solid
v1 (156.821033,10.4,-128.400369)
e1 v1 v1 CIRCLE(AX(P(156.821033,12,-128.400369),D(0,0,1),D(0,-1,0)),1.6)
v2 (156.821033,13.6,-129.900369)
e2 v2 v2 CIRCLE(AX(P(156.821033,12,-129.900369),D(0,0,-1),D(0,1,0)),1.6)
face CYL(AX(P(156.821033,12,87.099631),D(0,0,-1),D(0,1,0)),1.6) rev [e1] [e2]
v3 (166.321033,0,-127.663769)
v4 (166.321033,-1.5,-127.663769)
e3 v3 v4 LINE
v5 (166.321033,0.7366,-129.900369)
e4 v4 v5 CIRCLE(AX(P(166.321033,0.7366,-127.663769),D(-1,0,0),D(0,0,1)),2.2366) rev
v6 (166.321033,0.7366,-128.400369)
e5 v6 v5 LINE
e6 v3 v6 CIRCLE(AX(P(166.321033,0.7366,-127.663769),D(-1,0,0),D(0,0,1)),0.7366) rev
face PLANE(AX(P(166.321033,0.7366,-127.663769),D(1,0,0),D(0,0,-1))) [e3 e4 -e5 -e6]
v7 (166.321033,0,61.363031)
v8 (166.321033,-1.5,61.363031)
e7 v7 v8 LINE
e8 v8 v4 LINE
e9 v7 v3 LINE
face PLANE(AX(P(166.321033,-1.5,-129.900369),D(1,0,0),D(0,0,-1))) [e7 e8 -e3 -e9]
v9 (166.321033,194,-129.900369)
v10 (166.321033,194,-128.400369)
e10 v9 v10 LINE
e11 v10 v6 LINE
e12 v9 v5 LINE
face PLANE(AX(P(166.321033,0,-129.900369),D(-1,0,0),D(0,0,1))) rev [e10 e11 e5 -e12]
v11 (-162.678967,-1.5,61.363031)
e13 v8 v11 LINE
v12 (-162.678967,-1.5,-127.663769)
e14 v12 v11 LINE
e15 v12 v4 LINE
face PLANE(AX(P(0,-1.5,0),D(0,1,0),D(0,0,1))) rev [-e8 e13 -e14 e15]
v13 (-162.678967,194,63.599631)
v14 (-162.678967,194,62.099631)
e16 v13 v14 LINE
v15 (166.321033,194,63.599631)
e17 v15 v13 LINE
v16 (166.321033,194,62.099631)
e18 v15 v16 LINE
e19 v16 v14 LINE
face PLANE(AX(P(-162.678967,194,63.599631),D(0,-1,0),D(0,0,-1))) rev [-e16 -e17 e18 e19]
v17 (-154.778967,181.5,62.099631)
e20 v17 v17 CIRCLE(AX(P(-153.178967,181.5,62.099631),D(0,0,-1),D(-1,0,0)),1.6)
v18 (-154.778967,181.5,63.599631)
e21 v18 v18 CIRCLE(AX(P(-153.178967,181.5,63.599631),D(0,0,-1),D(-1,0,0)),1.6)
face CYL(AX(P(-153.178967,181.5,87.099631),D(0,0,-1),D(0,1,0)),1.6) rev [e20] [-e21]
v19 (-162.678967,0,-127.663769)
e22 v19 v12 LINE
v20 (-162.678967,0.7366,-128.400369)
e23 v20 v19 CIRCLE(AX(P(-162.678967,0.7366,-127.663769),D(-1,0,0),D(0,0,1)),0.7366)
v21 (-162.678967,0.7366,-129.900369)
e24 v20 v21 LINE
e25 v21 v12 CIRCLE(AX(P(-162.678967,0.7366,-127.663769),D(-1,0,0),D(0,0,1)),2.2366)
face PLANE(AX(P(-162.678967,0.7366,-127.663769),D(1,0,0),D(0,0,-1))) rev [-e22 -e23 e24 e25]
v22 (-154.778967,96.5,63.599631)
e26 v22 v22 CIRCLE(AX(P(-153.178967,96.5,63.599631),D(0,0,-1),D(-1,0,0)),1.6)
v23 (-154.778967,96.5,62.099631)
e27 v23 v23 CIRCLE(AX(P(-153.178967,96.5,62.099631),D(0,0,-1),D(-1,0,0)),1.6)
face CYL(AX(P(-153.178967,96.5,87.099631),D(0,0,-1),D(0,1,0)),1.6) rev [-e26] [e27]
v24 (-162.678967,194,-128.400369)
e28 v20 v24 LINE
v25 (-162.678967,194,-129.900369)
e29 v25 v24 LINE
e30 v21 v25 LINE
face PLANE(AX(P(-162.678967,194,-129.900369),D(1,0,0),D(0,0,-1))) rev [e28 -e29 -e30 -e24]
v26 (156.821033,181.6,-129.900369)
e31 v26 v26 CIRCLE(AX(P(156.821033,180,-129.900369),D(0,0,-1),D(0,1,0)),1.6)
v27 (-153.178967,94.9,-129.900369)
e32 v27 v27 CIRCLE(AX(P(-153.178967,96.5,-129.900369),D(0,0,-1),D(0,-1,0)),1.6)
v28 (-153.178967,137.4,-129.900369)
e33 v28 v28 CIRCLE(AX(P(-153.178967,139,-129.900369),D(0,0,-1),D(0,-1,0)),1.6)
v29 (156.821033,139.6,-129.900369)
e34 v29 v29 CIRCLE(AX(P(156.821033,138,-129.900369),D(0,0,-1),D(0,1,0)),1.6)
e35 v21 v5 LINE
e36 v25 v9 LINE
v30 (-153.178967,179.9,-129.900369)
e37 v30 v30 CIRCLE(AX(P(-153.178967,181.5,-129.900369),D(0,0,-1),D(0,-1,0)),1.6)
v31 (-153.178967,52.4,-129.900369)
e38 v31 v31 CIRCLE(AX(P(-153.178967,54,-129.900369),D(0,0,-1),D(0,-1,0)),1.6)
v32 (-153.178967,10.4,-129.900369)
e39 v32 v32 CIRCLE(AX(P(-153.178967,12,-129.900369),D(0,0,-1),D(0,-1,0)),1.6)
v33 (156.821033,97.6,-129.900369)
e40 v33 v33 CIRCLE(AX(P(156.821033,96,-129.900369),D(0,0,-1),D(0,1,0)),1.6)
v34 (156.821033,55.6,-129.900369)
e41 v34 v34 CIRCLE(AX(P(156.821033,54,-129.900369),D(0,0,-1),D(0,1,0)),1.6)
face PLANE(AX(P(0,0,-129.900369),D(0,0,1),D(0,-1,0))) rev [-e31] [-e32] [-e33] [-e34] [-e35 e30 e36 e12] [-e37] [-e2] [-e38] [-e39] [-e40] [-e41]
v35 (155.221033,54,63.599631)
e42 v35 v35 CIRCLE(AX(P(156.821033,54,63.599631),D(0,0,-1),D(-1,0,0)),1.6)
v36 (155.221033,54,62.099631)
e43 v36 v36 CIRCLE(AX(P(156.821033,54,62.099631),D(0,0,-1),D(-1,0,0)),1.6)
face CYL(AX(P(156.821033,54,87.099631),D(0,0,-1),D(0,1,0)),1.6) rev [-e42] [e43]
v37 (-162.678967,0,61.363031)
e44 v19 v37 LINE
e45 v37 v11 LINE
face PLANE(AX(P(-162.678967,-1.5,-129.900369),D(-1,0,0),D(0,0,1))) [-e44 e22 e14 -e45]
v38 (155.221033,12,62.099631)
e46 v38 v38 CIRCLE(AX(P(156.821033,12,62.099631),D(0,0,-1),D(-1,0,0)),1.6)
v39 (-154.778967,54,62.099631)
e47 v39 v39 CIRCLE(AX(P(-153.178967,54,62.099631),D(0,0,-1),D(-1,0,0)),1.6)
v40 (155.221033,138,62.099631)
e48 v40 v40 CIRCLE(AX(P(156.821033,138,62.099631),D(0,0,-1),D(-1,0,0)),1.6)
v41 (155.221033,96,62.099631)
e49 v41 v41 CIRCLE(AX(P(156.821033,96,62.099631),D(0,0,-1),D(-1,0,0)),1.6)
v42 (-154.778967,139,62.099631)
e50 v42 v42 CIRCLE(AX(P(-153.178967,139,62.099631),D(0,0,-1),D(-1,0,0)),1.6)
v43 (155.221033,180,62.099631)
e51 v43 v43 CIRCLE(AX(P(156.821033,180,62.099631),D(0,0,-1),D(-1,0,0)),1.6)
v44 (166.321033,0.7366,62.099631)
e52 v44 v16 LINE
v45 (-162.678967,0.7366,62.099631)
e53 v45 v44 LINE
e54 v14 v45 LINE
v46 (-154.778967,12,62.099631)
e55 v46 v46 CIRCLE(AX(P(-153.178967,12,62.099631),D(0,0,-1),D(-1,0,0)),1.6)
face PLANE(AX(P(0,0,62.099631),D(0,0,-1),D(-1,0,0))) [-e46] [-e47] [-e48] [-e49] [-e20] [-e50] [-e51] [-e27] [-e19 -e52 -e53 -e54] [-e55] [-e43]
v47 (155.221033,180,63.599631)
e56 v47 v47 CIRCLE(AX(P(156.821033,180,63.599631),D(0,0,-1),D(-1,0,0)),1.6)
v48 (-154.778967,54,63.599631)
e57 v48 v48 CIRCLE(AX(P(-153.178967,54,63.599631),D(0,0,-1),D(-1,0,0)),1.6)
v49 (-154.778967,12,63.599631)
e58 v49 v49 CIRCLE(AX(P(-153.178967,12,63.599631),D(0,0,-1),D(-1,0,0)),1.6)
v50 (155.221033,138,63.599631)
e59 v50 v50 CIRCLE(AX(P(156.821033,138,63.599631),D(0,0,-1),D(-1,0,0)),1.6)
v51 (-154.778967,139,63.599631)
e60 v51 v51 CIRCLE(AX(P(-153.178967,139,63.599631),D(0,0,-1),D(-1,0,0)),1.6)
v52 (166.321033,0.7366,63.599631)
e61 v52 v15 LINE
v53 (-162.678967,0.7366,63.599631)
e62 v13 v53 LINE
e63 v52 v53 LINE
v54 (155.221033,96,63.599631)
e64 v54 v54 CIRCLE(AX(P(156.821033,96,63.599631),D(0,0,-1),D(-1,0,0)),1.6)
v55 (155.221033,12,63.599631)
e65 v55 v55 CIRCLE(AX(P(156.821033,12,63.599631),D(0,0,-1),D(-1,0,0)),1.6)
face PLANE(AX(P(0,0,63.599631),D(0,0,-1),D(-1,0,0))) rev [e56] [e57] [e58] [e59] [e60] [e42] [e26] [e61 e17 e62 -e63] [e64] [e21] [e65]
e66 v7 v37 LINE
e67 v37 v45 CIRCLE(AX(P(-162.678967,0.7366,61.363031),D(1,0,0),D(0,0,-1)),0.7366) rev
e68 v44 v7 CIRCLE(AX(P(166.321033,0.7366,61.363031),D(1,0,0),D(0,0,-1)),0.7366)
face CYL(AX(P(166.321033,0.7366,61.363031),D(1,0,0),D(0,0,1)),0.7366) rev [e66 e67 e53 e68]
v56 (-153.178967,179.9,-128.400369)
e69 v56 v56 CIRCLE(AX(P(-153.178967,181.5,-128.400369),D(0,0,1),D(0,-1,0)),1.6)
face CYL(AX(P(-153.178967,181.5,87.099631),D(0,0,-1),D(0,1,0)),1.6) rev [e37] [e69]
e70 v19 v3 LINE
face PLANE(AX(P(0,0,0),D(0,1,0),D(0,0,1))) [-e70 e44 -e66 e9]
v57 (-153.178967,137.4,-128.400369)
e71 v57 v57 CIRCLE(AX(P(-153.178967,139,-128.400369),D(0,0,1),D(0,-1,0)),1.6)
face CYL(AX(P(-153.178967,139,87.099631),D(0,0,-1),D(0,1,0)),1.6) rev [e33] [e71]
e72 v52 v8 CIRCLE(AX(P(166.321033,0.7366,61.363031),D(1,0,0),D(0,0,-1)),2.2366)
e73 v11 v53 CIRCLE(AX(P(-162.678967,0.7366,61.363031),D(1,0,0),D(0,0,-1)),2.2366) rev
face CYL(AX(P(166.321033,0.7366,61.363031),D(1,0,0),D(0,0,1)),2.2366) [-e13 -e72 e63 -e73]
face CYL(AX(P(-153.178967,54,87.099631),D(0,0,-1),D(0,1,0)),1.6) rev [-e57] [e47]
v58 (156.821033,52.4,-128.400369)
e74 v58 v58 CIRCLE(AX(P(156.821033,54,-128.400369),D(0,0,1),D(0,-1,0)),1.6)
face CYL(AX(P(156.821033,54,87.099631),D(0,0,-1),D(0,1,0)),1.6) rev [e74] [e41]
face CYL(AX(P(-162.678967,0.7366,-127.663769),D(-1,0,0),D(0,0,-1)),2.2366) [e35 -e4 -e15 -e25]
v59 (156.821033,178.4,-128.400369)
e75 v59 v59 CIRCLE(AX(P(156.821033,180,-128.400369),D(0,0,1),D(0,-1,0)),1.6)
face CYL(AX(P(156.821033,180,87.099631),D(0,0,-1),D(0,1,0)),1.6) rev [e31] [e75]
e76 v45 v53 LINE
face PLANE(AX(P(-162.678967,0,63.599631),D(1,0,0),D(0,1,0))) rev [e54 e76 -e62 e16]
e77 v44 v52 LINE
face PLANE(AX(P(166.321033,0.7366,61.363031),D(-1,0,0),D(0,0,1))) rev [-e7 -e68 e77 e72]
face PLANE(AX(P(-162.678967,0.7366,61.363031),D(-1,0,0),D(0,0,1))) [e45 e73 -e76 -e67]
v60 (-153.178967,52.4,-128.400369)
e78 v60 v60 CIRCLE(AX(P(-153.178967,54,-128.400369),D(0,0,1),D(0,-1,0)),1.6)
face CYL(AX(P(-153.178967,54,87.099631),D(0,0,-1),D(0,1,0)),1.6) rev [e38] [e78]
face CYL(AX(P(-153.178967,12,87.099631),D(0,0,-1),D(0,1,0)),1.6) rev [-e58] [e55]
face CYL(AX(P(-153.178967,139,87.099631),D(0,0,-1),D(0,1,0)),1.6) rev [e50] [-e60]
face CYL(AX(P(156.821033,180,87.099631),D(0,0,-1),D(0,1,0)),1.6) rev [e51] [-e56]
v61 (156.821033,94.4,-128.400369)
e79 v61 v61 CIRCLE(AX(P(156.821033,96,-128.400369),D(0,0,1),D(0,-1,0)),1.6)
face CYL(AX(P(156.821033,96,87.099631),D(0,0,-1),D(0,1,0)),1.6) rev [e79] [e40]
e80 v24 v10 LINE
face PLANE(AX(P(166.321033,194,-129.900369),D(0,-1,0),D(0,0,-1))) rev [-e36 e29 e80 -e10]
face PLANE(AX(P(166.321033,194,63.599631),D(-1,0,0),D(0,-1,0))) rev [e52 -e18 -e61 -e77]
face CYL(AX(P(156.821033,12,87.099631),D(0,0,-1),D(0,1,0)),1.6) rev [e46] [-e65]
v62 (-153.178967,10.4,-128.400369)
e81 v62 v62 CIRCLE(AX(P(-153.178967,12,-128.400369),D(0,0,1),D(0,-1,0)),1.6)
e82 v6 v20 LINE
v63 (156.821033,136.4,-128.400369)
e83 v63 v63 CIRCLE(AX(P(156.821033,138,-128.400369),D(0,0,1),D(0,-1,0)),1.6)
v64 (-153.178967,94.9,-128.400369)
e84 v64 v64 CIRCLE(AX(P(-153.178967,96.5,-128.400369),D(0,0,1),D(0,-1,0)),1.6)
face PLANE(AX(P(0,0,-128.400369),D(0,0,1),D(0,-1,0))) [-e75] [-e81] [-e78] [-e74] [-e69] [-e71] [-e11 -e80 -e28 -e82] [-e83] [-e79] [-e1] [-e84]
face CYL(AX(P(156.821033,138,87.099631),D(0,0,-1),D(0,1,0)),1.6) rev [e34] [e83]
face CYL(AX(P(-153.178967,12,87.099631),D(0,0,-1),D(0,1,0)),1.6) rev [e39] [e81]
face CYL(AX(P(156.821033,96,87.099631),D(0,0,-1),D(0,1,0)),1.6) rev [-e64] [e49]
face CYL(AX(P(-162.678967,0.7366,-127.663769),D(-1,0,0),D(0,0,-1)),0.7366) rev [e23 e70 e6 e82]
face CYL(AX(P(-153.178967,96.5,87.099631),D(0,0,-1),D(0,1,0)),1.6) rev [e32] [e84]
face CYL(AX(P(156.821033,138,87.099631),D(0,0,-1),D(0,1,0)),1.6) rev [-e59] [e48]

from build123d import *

# Parameters (mm, degrees)
SKETCH_1_W                         = 329
SKETCH_1_H                         = 193.5
SM_BASE_FLANGE_1_DEPTH             = 1.5
SM_EDGE_FLANGE_1_STRIP_W           = 7.4732
SM_EDGE_FLANGE_1_STRIP_H           = 1.5
SM_EDGE_FLANGE_1_STRIP_CUT_DEPTH   = 329
SM_EDGE_FLANGE_1_STRIP_2_W         = 7.4732
SM_EDGE_FLANGE_1_STRIP_2_H         = 1.5
SM_EDGE_FLANGE_1_STRIP_CUT_2_DEPTH = 329
SM_EDGE_FLANGE_1_DEPTH             = 329
SM_EDGE_FLANGE_1_BEND_DEPTH        = 329
SKETCH_21_R                        = 1.6
CUT_EXTRUDE_2_DEPTH                = 217


# Sheet-metal steps are written as plain solids
with BuildPart() as part:
    # Sketch 1 → Базовая кромка1 (new body)
    with BuildSketch(Plane(origin=(0, 0, 0), x_dir=(1, 0, 0), z_dir=(0, 1, 0))):
        with Locations((1.82103321, 33.150369004)):
            Rectangle(SKETCH_1_W, SKETCH_1_H)
    extrude(amount=-SM_BASE_FLANGE_1_DEPTH)

    # Ребро-кромка1 strip (across the edge) → Ребро-кромка1 strip cut (cut)
    with BuildSketch(Plane(origin=(166.32103321, 0, -129.900369004), x_dir=(0, 0, 1), z_dir=(-1, 0, 0))):
        with Locations((-1.5, -0.75)):
            Rectangle(SM_EDGE_FLANGE_1_STRIP_W, SM_EDGE_FLANGE_1_STRIP_H)
    extrude(amount=SM_EDGE_FLANGE_1_STRIP_CUT_DEPTH, mode=Mode.SUBTRACT)

    # Ребро-кромка1 strip 2 (across the edge) → Ребро-кромка1 strip cut 2 (cut)
    with BuildSketch(Plane(origin=(-162.67896679, 0, 63.599630996), x_dir=(0, 0, -1), z_dir=(1, 0, 0))):
        with Locations((-1.5, -0.75)):
            Rectangle(SM_EDGE_FLANGE_1_STRIP_2_W, SM_EDGE_FLANGE_1_STRIP_2_H)
    extrude(amount=SM_EDGE_FLANGE_1_STRIP_CUT_2_DEPTH, mode=Mode.SUBTRACT)

    # Ребро-кромка1 section (across the edge) → Ребро-кромка1 (add)
    with BuildSketch(Plane(origin=(166.32103321, 0, -129.900369004), x_dir=(0, 0, 1), z_dir=(-1, 0, 0))):
        with BuildLine():
            Line((0, 0.7366), (0, 194))
            Line((0, 194), (1.5, 194))
            Line((1.5, 194), (1.5, 0.7366))
            ThreePointArc((1.5, 0.7366), (1.715745145, 0.215745145), (2.2366, 0))
            Line((2.2366, 0), (2.2366, -1.5))
            ThreePointArc((2.2366, -1.5), (0.655084973, -0.844915027), (0, 0.7366))
        make_face()
    extrude(amount=SM_EDGE_FLANGE_1_DEPTH)

    # Ребро-кромка1 section 2 (across the edge) → Ребро-кромка1 bend (add)
    with BuildSketch(Plane(origin=(-162.67896679, 0, 63.599630996), x_dir=(0, 0, -1), z_dir=(1, 0, 0))):
        with BuildLine():
            Line((0, 0.7366), (0, 194))
            Line((0, 194), (1.5, 194))
            Line((1.5, 194), (1.5, 0.7366))
            ThreePointArc((1.5, 0.7366), (1.715745145, 0.215745145), (2.2366, 0))
            Line((2.2366, 0), (2.2366, -1.5))
            ThreePointArc((2.2366, -1.5), (0.655084973, -0.844915027), (0, 0.7366))
        make_face()
    extrude(amount=SM_EDGE_FLANGE_1_BEND_DEPTH)

    # Эскиз21 → Вырез-Вытянуть2 (cut)
    with BuildSketch(Plane(origin=(0, 0, -129.900369004), x_dir=(-1, 0, 0), z_dir=(0, 0, -1))):
        with Locations((-156.82103321, 12)):
            Circle(SKETCH_21_R)
        with Locations((-156.82103321, 54)):
            Circle(SKETCH_21_R)
        with Locations((-156.82103321, 96)):
            Circle(SKETCH_21_R)
        with Locations((-156.82103321, 138)):
            Circle(SKETCH_21_R)
        with Locations((-156.82103321, 180)):
            Circle(SKETCH_21_R)
        with Locations((153.17896679, 181.5)):
            Circle(SKETCH_21_R)
        with Locations((153.17896679, 139)):
            Circle(SKETCH_21_R)
        with Locations((153.17896679, 96.5)):
            Circle(SKETCH_21_R)
        with Locations((153.17896679, 54)):
            Circle(SKETCH_21_R)
        with Locations((153.17896679, 12)):
            Circle(SKETCH_21_R)
    extrude(amount=-CUT_EXTRUDE_2_DEPTH, mode=Mode.SUBTRACT)


solid = part.part
